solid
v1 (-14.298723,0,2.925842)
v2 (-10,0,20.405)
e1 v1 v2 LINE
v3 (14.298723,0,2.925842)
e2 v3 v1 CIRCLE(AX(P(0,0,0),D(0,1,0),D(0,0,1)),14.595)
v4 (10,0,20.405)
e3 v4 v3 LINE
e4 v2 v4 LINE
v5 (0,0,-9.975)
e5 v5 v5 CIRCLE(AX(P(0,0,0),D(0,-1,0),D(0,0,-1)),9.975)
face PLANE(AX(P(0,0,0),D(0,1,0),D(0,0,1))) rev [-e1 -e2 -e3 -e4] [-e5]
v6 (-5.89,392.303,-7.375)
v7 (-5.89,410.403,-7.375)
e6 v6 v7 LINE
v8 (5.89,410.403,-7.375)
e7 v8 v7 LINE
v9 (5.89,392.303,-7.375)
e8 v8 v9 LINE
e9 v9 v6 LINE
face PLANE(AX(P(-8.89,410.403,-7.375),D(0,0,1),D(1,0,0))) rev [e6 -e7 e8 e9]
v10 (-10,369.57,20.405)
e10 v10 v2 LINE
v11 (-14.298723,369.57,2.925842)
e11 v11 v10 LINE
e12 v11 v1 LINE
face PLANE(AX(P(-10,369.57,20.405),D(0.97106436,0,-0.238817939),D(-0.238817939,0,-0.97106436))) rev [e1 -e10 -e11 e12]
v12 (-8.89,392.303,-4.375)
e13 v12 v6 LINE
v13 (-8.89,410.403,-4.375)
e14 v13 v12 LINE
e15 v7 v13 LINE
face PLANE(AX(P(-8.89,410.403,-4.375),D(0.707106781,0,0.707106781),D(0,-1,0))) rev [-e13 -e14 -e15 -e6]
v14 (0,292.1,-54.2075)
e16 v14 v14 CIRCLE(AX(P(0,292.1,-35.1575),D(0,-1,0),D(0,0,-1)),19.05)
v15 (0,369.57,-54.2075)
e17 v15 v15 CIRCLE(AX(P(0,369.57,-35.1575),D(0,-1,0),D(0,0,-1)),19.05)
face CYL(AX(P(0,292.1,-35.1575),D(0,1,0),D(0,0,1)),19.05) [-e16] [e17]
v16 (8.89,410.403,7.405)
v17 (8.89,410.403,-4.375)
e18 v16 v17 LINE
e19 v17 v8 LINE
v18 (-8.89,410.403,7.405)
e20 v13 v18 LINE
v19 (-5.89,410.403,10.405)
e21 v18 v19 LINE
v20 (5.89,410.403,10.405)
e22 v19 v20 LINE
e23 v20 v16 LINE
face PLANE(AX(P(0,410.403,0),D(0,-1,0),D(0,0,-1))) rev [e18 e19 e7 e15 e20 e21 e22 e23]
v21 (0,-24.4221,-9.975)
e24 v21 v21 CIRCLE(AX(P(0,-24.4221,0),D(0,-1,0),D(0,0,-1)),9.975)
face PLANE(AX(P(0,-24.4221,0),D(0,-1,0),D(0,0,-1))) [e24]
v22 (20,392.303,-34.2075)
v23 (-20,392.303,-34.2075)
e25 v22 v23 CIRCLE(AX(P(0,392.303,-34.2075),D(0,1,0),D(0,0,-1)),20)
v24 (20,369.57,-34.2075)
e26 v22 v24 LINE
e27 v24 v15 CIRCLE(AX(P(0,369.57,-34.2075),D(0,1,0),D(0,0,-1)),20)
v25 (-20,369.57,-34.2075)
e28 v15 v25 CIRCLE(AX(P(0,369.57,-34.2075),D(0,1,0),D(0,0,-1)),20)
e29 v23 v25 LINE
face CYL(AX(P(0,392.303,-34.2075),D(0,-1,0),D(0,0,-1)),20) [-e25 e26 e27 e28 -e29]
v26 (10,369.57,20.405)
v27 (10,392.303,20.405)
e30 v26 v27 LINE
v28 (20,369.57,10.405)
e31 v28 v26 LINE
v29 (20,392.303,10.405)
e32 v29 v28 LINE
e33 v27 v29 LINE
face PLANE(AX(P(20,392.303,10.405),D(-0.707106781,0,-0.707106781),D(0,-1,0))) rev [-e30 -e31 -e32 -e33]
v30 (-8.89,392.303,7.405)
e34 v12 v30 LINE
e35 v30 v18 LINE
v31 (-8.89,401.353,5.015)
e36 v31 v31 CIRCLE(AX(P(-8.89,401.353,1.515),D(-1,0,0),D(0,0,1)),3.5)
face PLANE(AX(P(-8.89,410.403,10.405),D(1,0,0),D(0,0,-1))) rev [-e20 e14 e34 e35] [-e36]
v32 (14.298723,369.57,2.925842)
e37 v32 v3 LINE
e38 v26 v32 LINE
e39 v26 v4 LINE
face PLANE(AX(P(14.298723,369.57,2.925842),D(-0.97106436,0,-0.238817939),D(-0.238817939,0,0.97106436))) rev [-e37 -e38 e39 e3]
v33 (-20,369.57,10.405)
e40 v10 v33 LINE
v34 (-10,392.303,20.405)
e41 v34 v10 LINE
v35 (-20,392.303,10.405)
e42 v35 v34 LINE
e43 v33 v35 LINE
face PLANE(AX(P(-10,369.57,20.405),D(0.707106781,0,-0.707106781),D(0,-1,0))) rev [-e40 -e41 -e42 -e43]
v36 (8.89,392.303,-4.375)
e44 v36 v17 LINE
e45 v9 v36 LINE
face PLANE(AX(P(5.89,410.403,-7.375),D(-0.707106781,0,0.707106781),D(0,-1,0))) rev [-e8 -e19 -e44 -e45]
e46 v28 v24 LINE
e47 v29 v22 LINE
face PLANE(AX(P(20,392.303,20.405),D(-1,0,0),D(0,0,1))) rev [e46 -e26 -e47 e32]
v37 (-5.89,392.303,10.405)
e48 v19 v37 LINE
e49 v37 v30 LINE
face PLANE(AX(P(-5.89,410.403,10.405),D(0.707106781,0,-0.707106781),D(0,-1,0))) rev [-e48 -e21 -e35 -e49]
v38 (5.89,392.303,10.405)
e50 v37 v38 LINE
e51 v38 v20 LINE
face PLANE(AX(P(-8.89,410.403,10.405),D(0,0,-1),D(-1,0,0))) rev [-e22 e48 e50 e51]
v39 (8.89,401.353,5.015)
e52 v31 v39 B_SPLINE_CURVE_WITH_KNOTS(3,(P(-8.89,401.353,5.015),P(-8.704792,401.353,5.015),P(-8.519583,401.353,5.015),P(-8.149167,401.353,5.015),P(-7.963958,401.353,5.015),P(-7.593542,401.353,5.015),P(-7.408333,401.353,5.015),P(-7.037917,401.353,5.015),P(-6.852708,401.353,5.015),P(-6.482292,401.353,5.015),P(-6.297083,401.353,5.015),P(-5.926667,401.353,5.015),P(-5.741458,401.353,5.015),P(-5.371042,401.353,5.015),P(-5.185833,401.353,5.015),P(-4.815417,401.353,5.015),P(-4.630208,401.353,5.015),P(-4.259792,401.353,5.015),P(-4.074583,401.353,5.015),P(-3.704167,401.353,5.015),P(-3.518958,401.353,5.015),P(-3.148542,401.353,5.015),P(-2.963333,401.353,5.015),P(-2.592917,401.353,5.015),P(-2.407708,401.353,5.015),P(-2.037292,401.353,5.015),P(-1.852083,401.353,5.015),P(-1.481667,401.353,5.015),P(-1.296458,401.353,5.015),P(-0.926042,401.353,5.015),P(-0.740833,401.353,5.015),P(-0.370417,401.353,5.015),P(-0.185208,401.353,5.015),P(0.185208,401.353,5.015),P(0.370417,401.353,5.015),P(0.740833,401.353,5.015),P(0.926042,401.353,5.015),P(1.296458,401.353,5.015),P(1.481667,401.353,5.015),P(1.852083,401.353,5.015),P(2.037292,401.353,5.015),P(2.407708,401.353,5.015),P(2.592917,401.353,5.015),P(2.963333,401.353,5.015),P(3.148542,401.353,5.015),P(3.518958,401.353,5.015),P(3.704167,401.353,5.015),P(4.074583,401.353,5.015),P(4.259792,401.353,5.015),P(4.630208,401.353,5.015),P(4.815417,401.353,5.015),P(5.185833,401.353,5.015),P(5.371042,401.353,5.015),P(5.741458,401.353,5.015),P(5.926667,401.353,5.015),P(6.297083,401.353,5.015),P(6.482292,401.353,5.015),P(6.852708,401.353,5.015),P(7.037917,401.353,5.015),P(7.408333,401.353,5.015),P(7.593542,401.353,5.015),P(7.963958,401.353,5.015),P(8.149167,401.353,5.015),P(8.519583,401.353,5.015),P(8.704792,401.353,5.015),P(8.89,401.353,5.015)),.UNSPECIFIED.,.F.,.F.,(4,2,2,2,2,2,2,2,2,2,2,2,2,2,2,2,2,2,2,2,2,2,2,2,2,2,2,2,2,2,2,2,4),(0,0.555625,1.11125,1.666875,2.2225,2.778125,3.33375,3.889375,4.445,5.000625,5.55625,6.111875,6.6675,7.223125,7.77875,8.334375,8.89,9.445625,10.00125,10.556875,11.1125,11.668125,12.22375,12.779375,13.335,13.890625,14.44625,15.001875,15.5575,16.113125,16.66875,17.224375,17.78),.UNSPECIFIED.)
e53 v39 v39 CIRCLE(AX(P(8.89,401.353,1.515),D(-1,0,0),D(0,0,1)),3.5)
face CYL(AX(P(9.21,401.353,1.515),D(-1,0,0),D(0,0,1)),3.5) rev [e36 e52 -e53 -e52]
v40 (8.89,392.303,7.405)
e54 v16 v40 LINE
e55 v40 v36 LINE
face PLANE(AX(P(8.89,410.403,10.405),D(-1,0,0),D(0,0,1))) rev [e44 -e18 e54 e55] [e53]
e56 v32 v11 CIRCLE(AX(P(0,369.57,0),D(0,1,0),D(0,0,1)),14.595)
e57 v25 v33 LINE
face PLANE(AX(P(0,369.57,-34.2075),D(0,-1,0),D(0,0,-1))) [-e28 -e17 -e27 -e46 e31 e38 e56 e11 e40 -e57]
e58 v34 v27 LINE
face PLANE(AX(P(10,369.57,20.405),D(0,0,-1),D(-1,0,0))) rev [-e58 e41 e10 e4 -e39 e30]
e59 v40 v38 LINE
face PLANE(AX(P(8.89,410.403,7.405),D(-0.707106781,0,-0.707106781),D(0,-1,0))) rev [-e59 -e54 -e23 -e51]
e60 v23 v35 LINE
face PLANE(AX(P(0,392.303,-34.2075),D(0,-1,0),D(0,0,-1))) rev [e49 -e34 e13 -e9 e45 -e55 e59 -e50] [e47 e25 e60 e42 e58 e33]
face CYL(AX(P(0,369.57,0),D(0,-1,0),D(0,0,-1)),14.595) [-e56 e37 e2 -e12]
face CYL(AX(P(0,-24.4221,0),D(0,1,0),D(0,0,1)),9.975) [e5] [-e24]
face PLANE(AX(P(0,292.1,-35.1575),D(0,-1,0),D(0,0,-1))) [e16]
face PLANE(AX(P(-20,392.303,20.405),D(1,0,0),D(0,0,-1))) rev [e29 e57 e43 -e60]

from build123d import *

# Parameters (mm, degrees)
STOCK_LINEAR_ACTUATOR_CLAMPS_2026_1_DEPTH   = 369.57
STOCK_LINEAR_START                          = -24.4221
STOCK_LINEAR_ACTUATOR_CLAMPS_2026_2_R       = 9.975
STOCK_LINEAR_ACTUATOR_CLAMPS_2026_1_2_DEPTH = 24.4221
BOSS_EXTRUDE1_DEPTH                         = 22.733
SKETCH4_R                                   = 19.05
BOSS_EXTRUDE4_DEPTH                         = 77.47
CHAMFER1_SIZE                               = 10
SKETCH5_W                                   = 17.78
SKETCH5_H                                   = 17.78
BOSS_EXTRUDE5_DEPTH                         = 18.1
SKETCH6_R                                   = 3.5
CUT_EXTRUDE1_DEPTH                          = 18.1
CHAMFER2_SIZE                               = 3


# Read off the part's stored shape, not the designer's step: Stock-Linear Actuator Clamps (2026)-1
with BuildPart() as part:
    # Stock-Linear Actuator Clamps (2026)-1 ou → Stock-Linear Actuator Clamps (2026)-1 (new body)
    with BuildSketch(Plane(origin=(0, 0, 0), x_dir=(1, 0, 0), z_dir=(0, 1, 0))):
        with BuildLine():
            ThreePointArc((14.298722896, -2.925841512), (0, 14.595), (-14.298722896, -2.925841512))
            Line((-14.298722896, -2.925841512), (-10, -20.405))
            Line((-10, -20.405), (10, -20.405))
            Line((10, -20.405), (14.298722896, -2.925841512))
        make_face()
    extrude(amount=STOCK_LINEAR_ACTUATOR_CLAMPS_2026_1_DEPTH)

    # Stock-Linear Actuator Clamps _2026_- 2 → Stock-Linear Actuator Clamps _2026_-1 2 (add)
    with BuildSketch(Plane(origin=(0, 0, 0), x_dir=(1, 0, 0), z_dir=(0, 1, 0)).offset(STOCK_LINEAR_START)):
        Circle(STOCK_LINEAR_ACTUATOR_CLAMPS_2026_2_R)
    extrude(amount=STOCK_LINEAR_ACTUATOR_CLAMPS_2026_1_2_DEPTH)

    # Sketch3 → Boss-Extrude1 (add)
    with BuildSketch(Plane(origin=(0, 369.57, 0), x_dir=(1, 0, 0), z_dir=(0, 1, 0))):
        with BuildLine():
            Line((-20, -20.405), (20, -20.405))
            Line((20, -20.405), (20, 34.2075))
            ThreePointArc((20, 34.2075), (0, 54.2075), (-20, 34.2075))
            Line((-20, 34.2075), (-20, -20.405))
        make_face()
    extrude(amount=BOSS_EXTRUDE1_DEPTH)

    # Sketch4 → Boss-Extrude4 (add)
    with BuildSketch(Plane.XZ.offset(-369.57)):
        with Locations(Location((0, -35.1575, 0), (0, 0, 269.999148225))):
            Circle(SKETCH4_R)
    extrude(amount=BOSS_EXTRUDE4_DEPTH)

    # Chamfer1
    chamfer1_edges = [part.edges().sort_by_distance(p)[0] for p in [
        (-20, 380.9365, 20.405),
        (20, 380.9365, 20.405),
    ]]
    chamfer(chamfer1_edges, length=CHAMFER1_SIZE)

    # Sketch5 → Boss-Extrude5 (add)
    with BuildSketch(Plane(origin=(0, 392.303, 0), x_dir=(1, 0, 0), z_dir=(0, 1, 0))):
        with Locations((0, -1.515)):
            Rectangle(SKETCH5_W, SKETCH5_H)
    extrude(amount=BOSS_EXTRUDE5_DEPTH)

    # Sketch6 → Cut-Extrude1 (cut)
    with BuildSketch(Plane.ZY.offset(8.89)):
        with Locations((1.515, 401.353)):
            Circle(SKETCH6_R)
    extrude(amount=-CUT_EXTRUDE1_DEPTH, mode=Mode.SUBTRACT)

    # Chamfer2
    chamfer2_edges = [part.edges().sort_by_distance(p)[0] for p in [
        (-8.89, 401.353, -7.375),
        (-8.89, 401.353, 10.405),
        (8.89, 401.353, 10.405),
        (8.89, 401.353, -7.375),
    ]]
    chamfer(chamfer2_edges, length=CHAMFER2_SIZE)


solid = part.part
